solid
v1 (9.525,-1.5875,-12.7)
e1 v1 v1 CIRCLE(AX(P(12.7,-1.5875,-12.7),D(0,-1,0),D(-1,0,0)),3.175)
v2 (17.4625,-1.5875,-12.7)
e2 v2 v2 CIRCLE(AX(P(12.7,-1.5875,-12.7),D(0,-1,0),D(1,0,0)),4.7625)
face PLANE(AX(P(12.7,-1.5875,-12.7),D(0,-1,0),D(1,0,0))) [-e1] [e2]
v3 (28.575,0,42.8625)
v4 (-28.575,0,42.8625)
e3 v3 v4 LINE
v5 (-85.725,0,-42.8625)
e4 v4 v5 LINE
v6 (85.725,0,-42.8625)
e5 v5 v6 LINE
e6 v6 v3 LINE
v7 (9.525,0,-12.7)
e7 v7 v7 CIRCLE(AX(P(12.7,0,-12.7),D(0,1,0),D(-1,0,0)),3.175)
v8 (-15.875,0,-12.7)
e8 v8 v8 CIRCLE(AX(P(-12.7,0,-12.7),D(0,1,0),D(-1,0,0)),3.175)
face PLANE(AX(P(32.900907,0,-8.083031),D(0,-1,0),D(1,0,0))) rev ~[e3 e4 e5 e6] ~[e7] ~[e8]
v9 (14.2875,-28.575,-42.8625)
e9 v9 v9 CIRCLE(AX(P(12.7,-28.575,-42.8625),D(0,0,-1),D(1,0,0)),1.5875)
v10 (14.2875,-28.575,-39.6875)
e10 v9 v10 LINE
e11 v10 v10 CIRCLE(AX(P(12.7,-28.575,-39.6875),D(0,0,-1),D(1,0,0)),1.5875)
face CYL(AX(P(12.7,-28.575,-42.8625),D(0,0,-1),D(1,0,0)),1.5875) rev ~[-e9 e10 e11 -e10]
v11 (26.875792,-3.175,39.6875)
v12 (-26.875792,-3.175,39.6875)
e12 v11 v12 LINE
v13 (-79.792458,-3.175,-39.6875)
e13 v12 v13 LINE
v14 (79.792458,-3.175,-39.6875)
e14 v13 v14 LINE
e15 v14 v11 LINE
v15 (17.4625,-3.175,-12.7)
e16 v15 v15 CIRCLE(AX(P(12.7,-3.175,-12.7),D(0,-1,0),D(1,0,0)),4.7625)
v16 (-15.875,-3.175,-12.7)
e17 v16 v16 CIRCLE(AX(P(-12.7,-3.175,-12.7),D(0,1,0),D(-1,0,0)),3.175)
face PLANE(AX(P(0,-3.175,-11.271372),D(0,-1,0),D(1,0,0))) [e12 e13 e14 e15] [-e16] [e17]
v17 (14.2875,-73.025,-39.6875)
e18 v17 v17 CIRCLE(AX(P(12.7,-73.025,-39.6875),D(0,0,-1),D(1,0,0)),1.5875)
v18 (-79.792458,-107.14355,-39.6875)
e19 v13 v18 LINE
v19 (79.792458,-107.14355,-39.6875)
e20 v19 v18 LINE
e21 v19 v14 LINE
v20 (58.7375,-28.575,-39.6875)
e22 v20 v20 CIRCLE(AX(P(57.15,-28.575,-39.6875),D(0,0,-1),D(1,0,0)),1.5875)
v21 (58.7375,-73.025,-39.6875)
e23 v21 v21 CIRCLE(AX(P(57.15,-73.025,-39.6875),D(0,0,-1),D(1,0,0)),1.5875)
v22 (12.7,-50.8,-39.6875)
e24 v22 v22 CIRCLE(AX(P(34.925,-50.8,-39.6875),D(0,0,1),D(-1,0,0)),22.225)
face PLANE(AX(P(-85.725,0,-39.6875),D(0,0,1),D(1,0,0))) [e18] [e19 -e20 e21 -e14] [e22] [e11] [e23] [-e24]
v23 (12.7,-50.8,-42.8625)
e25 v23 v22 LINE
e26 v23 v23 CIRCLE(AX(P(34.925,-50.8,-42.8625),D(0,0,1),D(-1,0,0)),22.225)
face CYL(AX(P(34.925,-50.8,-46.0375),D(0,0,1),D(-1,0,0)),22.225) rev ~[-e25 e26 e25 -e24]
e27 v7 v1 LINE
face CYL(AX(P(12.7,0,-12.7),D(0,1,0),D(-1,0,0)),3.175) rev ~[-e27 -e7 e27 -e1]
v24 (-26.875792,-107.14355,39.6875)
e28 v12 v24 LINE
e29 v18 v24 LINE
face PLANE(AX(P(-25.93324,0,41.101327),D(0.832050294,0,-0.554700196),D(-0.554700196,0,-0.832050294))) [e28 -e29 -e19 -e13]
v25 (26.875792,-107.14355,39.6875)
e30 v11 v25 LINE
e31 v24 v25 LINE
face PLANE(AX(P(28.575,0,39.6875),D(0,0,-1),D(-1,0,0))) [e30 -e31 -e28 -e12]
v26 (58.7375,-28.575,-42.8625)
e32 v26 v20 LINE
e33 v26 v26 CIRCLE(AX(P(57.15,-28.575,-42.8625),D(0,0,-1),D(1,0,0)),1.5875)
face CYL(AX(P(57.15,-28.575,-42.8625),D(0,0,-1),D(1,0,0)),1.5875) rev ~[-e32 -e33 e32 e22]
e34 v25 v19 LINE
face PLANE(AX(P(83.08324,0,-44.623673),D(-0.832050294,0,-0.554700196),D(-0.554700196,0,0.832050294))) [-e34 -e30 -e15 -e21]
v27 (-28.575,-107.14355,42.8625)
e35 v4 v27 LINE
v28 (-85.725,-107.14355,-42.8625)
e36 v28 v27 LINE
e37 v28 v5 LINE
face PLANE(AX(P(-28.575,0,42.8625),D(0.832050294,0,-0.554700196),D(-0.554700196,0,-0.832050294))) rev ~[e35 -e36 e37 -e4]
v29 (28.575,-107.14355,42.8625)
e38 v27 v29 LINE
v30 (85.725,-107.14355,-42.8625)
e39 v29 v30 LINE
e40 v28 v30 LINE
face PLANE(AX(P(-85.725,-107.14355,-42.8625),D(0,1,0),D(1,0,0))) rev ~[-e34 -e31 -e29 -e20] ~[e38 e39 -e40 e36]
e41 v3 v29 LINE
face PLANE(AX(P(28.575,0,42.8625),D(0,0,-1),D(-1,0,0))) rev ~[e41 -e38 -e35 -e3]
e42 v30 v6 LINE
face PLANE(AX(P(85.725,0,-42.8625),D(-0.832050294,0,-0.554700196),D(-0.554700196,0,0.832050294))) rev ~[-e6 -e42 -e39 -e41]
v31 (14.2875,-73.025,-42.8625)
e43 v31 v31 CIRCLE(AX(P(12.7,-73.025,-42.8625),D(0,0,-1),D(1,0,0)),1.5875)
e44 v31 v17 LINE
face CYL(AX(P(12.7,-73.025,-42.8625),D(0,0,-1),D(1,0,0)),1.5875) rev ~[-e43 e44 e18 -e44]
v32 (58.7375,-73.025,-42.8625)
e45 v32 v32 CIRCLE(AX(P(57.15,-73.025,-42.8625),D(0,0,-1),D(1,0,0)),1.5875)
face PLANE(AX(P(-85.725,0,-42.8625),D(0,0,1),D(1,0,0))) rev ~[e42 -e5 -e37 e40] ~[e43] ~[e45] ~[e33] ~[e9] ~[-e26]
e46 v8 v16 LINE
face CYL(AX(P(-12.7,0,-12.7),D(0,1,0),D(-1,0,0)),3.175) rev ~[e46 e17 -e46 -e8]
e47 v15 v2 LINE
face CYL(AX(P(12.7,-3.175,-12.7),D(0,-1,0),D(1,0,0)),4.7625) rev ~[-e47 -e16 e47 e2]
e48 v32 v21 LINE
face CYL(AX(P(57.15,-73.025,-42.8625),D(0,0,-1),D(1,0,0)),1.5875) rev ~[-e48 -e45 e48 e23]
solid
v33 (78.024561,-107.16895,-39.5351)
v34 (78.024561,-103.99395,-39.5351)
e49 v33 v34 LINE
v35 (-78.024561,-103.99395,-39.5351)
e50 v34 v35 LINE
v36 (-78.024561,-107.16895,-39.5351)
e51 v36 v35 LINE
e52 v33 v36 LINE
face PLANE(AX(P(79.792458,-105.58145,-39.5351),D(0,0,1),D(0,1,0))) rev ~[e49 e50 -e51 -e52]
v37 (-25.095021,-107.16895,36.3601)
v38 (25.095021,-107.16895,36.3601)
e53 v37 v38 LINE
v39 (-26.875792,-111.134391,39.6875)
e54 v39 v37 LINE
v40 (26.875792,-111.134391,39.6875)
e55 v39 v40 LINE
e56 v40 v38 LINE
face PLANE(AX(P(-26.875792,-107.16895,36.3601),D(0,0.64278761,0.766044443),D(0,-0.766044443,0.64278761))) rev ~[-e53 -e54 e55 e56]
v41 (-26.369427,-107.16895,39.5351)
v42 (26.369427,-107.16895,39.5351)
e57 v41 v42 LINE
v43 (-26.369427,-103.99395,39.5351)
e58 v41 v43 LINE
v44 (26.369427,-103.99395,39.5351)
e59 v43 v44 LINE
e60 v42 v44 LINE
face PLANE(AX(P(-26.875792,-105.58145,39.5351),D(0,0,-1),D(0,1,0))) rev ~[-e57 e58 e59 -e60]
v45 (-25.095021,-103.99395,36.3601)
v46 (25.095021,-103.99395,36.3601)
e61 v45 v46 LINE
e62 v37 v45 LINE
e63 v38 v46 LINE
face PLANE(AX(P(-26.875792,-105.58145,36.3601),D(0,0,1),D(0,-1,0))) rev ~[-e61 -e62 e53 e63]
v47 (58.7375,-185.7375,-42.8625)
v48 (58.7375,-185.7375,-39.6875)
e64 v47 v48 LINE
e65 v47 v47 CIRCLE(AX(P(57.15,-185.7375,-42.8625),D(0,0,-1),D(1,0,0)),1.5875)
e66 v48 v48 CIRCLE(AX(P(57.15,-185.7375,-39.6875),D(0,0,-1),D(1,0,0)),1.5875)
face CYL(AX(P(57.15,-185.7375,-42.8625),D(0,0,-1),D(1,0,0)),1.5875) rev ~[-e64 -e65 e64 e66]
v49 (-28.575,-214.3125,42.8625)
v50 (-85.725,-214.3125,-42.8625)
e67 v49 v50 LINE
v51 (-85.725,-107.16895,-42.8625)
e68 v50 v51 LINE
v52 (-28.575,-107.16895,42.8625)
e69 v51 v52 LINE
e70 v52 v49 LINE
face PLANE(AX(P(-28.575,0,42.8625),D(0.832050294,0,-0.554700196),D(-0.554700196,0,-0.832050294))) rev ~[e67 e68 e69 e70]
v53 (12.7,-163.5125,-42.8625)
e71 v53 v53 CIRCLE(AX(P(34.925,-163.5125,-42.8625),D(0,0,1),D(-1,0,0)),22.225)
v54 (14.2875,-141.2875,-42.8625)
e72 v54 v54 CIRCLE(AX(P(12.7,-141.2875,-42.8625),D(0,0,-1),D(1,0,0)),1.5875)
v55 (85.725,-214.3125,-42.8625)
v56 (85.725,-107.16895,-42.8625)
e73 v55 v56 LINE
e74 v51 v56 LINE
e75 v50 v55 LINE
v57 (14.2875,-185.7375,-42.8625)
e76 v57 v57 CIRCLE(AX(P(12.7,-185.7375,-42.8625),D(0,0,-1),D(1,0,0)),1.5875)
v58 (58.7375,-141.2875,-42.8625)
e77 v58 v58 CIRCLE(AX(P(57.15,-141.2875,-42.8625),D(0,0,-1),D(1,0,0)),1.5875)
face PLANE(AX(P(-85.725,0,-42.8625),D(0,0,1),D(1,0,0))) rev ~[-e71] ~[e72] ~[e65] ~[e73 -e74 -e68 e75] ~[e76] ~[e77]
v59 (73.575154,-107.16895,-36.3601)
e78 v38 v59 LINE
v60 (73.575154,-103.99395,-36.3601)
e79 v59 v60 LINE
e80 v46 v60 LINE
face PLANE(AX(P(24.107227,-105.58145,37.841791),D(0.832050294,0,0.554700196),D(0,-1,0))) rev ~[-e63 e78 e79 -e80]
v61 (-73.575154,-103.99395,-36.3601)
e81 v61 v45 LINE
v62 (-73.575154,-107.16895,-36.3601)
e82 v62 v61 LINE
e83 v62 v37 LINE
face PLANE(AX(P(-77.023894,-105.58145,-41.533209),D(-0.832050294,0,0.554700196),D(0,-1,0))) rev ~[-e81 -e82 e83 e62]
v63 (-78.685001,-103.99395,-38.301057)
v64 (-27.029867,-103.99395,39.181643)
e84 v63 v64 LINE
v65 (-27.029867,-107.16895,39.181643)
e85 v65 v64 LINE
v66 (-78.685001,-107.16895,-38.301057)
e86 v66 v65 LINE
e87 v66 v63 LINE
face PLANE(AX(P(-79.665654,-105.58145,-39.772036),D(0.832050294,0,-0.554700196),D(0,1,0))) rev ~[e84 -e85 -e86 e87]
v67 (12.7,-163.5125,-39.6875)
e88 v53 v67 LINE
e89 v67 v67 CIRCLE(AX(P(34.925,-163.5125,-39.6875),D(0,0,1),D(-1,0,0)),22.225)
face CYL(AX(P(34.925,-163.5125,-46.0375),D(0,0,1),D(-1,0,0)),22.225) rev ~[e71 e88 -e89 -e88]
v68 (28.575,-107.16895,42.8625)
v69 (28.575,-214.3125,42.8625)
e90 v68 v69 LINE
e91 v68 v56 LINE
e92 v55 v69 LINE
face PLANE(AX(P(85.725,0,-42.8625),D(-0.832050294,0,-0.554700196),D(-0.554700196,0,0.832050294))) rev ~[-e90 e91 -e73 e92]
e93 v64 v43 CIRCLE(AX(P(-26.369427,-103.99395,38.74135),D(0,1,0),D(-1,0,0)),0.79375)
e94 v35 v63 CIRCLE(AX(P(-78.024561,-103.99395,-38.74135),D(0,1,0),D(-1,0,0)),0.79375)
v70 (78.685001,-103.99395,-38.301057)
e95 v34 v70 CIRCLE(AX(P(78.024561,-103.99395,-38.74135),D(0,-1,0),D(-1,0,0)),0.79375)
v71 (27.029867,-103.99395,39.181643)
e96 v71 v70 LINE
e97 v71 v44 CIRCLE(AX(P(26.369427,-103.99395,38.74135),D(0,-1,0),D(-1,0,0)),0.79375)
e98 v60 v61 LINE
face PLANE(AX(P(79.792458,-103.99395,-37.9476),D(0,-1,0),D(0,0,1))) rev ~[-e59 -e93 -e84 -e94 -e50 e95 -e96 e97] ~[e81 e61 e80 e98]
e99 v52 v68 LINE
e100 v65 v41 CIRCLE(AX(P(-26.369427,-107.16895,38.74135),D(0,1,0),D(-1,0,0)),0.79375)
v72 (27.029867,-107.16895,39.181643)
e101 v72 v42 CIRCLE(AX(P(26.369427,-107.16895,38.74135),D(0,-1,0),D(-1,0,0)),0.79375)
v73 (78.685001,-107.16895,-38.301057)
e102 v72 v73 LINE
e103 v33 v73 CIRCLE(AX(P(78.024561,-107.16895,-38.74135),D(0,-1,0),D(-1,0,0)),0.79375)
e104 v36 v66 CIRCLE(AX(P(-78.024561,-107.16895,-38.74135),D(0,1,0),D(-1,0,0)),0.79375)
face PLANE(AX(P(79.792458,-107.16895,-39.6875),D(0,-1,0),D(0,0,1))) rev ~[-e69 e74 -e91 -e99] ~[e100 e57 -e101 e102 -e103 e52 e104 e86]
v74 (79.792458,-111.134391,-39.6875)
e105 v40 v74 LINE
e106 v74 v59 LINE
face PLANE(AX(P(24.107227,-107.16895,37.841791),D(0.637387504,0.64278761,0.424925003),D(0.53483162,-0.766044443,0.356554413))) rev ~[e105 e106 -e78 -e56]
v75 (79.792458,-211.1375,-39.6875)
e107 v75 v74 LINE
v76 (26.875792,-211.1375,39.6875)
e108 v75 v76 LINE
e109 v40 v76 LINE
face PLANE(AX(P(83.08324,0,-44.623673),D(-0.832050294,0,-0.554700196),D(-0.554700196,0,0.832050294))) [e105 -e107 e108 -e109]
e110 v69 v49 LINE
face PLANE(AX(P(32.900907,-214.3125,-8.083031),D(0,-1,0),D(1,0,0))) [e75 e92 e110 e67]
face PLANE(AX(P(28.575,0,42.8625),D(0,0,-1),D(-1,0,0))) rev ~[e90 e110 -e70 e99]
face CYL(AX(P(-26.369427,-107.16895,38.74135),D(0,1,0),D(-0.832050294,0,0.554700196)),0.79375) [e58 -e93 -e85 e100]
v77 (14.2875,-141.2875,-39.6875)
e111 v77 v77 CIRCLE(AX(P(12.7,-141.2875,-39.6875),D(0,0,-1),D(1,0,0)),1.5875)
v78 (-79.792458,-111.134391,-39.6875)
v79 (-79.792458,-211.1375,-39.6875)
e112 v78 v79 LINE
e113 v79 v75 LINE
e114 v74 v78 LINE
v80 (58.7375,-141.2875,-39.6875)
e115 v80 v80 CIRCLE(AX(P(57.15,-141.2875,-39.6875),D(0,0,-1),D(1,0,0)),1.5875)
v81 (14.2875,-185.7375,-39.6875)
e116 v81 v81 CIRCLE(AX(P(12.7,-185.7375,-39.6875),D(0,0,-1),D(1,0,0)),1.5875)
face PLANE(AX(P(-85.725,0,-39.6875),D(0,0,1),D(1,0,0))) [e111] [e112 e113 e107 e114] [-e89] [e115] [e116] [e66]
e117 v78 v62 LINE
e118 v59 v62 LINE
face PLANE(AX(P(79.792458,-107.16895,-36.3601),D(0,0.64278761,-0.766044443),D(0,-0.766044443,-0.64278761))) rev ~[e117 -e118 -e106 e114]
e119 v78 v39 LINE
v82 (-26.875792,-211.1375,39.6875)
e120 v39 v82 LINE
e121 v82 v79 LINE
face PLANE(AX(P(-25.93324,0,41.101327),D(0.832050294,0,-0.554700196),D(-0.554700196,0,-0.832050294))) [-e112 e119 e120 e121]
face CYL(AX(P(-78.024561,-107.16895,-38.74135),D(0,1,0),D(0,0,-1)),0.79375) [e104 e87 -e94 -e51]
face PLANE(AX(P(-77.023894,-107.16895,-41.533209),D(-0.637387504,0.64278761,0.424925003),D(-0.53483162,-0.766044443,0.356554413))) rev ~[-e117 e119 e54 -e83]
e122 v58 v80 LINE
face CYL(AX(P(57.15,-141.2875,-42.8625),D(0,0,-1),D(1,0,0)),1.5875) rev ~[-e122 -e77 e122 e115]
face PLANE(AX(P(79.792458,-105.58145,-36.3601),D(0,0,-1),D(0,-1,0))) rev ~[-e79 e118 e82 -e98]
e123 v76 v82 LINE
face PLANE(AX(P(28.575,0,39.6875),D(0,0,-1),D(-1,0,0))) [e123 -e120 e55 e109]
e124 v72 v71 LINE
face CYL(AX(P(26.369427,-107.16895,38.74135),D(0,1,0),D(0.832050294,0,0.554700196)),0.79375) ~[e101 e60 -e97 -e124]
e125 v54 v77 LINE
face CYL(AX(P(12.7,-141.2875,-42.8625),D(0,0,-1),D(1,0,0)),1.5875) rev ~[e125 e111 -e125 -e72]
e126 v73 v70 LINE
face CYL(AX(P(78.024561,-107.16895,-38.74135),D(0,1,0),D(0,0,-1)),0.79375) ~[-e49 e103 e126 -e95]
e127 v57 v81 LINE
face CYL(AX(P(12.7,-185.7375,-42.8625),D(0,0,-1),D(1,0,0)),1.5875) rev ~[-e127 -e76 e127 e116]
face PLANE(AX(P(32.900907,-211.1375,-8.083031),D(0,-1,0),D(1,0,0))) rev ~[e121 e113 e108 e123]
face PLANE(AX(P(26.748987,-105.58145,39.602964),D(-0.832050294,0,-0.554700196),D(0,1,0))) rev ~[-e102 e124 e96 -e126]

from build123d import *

# Parameters (mm, degrees)
F1_DEPTH  = 214.3125
F2_T      = -3.175
F4_DEPTH  = 3.175
F6_D      = 44.45
F6_DEPTH  = 3.175
F6_TIP    = 13.3541272579
F7_R      = 3.175
F8_DEPTH  = 25.4
F9_R      = 3.175
F10_DEPTH = 25.4
F5_R      = 1.5875
F11_DEPTH = 12.7
F12_R     = 4.7625
F12_R_2   = 3.175
F13_DEPTH = 1.5875
F14_W     = 171.45
F14_H     = 0.0254
F15_DEPTH = 85.725
F16_W     = 3.175
F16_H     = 3.175
F18_R     = 0.79375


with BuildPart() as f1:
    # F0 (on Front) → F1 (new body)
    with BuildSketch(Plane.XZ):
        Polygon((0, 42.8625), (0, -42.8625), (85.725, -42.8625), (28.575, 42.8625), align=None)
        Polygon((-28.575, 42.8625), (-85.725, -42.8625), (0, -42.8625), (0, 42.8625), align=None)
    extrude(amount=F1_DEPTH)

    # F2
    f2_openings = [f1.faces().sort_by_distance(p)[0] for p in [
        (0, 0, -7.14375),
    ]]
    offset(amount=F2_T, openings=f2_openings)

    # F3 (on Front) → F4 (join)
    with BuildSketch(Plane.XZ):
        Polygon((28.575, 42.8625), (-28.575, 42.8625), (-85.725, -42.8625), (85.725, -42.8625), align=None)
    extrude(amount=F4_DEPTH)

    # F6
    with Locations(Plane(origin=(0, 0, -42.8625), x_dir=(1, 0, 0), z_dir=(0, 0, -1))):
        with Locations((34.925, 50.8), (34.925, 163.5125)):
            Hole(F6_D / 2, depth=F6_DEPTH)
            with Locations((0, 0, -(F6_DEPTH + F6_TIP / 2))):  # 118° drill point
                Cone(0, F6_D / 2, F6_TIP, mode=Mode.SUBTRACT)

    # F7 (on face) → F8 (cut)
    with BuildSketch(Plane(origin=(0, 0, 0), x_dir=(-1, 0, 0), z_dir=(0, 1, 0))):
        with Locations((12.7, -12.7)):
            Circle(F7_R)
    extrude(amount=-F8_DEPTH, mode=Mode.SUBTRACT)

    # F9 (on face) → F10 (cut)
    with BuildSketch(Plane(origin=(0, 0, 0), x_dir=(-1, 0, 0), z_dir=(0, 1, 0))):
        with Locations((-12.7, -12.7)):
            Circle(F9_R)
    extrude(amount=-F10_DEPTH, mode=Mode.SUBTRACT)

    # F5 (on face) → F11 (cut)
    with BuildSketch(Plane(origin=(0, 0, -42.8625), x_dir=(1, 0, 0), z_dir=(0, 0, -1))):
        with Locations((57.15, 73.025)):
            Circle(F5_R)
        with Locations((57.15, 28.575)):
            Circle(F5_R)
        with Locations((12.7, 28.575)):
            Circle(F5_R)
        with Locations((12.7, 73.025)):
            Circle(F5_R)
        with Locations((12.7, 185.7375)):
            Circle(F5_R)
        with Locations((57.15, 185.7375)):
            Circle(F5_R)
        with Locations((57.15, 141.2875)):
            Circle(F5_R)
        with Locations((12.7, 141.2875)):
            Circle(F5_R)
    extrude(amount=-F11_DEPTH, mode=Mode.SUBTRACT)

    # F12 (on face) → F13 (cut)
    with BuildSketch(Plane.XZ.offset(3.175)):
        with Locations((12.7, -12.7)):
            Circle(F12_R)
        with Locations((12.7, -12.7)):
            Circle(F12_R_2, mode=Mode.SUBTRACT)
    extrude(amount=-F13_DEPTH, mode=Mode.SUBTRACT)

    # F14 (on face) → F15 (cut, through all)
    with BuildSketch(Plane(origin=(0, 0, -42.8625), x_dir=(1, 0, 0), z_dir=(0, 0, -1))):
        with Locations((0, 107.15625)):
            Rectangle(F14_W, F14_H)
    extrude(amount=-F15_DEPTH, mode=Mode.SUBTRACT)

    # F17: sweep along a path in F17_path
    with BuildLine(Plane(origin=(79.7924582335, -107.16895, -39.6875), x_dir=(0, 0, -1), z_dir=(0, 1, 0))) as f17_path:
        Line((0, 0), (0, 159.5849164669))
        Line((0, 159.5849164669), (-79.375, 106.6682498003))
        Line((-79.375, 106.6682498003), (-79.375, 52.9166666667))
        Line((-79.375, 52.9166666667), (0, 0))
    # F16 (on Right) → F17 (sweep)
    with BuildSketch(Plane.YZ):
        Polygon((-107.16895, -36.3601), (-111.134390904, -39.6875), (-107.16895, -39.6875), (-107.16895, -39.5351), align=None)
        with Locations((-105.58145, -37.9476)):
            Rectangle(F16_W, F16_H)
    sweep(path=f17_path.line, transition=Transition.RIGHT)

    # F18
    f18_edges = [f1.edges().sort_by_distance(p)[0] for p in [
        (-26.79423, -105.58145, 39.5351),
        (26.79423, -105.58145, 39.5351),
        (-79.507696, -105.58145, -39.5351),
        (79.507696, -105.58145, -39.5351),
    ]]
    fillet(f18_edges, radius=F18_R)


solid = f1.part
